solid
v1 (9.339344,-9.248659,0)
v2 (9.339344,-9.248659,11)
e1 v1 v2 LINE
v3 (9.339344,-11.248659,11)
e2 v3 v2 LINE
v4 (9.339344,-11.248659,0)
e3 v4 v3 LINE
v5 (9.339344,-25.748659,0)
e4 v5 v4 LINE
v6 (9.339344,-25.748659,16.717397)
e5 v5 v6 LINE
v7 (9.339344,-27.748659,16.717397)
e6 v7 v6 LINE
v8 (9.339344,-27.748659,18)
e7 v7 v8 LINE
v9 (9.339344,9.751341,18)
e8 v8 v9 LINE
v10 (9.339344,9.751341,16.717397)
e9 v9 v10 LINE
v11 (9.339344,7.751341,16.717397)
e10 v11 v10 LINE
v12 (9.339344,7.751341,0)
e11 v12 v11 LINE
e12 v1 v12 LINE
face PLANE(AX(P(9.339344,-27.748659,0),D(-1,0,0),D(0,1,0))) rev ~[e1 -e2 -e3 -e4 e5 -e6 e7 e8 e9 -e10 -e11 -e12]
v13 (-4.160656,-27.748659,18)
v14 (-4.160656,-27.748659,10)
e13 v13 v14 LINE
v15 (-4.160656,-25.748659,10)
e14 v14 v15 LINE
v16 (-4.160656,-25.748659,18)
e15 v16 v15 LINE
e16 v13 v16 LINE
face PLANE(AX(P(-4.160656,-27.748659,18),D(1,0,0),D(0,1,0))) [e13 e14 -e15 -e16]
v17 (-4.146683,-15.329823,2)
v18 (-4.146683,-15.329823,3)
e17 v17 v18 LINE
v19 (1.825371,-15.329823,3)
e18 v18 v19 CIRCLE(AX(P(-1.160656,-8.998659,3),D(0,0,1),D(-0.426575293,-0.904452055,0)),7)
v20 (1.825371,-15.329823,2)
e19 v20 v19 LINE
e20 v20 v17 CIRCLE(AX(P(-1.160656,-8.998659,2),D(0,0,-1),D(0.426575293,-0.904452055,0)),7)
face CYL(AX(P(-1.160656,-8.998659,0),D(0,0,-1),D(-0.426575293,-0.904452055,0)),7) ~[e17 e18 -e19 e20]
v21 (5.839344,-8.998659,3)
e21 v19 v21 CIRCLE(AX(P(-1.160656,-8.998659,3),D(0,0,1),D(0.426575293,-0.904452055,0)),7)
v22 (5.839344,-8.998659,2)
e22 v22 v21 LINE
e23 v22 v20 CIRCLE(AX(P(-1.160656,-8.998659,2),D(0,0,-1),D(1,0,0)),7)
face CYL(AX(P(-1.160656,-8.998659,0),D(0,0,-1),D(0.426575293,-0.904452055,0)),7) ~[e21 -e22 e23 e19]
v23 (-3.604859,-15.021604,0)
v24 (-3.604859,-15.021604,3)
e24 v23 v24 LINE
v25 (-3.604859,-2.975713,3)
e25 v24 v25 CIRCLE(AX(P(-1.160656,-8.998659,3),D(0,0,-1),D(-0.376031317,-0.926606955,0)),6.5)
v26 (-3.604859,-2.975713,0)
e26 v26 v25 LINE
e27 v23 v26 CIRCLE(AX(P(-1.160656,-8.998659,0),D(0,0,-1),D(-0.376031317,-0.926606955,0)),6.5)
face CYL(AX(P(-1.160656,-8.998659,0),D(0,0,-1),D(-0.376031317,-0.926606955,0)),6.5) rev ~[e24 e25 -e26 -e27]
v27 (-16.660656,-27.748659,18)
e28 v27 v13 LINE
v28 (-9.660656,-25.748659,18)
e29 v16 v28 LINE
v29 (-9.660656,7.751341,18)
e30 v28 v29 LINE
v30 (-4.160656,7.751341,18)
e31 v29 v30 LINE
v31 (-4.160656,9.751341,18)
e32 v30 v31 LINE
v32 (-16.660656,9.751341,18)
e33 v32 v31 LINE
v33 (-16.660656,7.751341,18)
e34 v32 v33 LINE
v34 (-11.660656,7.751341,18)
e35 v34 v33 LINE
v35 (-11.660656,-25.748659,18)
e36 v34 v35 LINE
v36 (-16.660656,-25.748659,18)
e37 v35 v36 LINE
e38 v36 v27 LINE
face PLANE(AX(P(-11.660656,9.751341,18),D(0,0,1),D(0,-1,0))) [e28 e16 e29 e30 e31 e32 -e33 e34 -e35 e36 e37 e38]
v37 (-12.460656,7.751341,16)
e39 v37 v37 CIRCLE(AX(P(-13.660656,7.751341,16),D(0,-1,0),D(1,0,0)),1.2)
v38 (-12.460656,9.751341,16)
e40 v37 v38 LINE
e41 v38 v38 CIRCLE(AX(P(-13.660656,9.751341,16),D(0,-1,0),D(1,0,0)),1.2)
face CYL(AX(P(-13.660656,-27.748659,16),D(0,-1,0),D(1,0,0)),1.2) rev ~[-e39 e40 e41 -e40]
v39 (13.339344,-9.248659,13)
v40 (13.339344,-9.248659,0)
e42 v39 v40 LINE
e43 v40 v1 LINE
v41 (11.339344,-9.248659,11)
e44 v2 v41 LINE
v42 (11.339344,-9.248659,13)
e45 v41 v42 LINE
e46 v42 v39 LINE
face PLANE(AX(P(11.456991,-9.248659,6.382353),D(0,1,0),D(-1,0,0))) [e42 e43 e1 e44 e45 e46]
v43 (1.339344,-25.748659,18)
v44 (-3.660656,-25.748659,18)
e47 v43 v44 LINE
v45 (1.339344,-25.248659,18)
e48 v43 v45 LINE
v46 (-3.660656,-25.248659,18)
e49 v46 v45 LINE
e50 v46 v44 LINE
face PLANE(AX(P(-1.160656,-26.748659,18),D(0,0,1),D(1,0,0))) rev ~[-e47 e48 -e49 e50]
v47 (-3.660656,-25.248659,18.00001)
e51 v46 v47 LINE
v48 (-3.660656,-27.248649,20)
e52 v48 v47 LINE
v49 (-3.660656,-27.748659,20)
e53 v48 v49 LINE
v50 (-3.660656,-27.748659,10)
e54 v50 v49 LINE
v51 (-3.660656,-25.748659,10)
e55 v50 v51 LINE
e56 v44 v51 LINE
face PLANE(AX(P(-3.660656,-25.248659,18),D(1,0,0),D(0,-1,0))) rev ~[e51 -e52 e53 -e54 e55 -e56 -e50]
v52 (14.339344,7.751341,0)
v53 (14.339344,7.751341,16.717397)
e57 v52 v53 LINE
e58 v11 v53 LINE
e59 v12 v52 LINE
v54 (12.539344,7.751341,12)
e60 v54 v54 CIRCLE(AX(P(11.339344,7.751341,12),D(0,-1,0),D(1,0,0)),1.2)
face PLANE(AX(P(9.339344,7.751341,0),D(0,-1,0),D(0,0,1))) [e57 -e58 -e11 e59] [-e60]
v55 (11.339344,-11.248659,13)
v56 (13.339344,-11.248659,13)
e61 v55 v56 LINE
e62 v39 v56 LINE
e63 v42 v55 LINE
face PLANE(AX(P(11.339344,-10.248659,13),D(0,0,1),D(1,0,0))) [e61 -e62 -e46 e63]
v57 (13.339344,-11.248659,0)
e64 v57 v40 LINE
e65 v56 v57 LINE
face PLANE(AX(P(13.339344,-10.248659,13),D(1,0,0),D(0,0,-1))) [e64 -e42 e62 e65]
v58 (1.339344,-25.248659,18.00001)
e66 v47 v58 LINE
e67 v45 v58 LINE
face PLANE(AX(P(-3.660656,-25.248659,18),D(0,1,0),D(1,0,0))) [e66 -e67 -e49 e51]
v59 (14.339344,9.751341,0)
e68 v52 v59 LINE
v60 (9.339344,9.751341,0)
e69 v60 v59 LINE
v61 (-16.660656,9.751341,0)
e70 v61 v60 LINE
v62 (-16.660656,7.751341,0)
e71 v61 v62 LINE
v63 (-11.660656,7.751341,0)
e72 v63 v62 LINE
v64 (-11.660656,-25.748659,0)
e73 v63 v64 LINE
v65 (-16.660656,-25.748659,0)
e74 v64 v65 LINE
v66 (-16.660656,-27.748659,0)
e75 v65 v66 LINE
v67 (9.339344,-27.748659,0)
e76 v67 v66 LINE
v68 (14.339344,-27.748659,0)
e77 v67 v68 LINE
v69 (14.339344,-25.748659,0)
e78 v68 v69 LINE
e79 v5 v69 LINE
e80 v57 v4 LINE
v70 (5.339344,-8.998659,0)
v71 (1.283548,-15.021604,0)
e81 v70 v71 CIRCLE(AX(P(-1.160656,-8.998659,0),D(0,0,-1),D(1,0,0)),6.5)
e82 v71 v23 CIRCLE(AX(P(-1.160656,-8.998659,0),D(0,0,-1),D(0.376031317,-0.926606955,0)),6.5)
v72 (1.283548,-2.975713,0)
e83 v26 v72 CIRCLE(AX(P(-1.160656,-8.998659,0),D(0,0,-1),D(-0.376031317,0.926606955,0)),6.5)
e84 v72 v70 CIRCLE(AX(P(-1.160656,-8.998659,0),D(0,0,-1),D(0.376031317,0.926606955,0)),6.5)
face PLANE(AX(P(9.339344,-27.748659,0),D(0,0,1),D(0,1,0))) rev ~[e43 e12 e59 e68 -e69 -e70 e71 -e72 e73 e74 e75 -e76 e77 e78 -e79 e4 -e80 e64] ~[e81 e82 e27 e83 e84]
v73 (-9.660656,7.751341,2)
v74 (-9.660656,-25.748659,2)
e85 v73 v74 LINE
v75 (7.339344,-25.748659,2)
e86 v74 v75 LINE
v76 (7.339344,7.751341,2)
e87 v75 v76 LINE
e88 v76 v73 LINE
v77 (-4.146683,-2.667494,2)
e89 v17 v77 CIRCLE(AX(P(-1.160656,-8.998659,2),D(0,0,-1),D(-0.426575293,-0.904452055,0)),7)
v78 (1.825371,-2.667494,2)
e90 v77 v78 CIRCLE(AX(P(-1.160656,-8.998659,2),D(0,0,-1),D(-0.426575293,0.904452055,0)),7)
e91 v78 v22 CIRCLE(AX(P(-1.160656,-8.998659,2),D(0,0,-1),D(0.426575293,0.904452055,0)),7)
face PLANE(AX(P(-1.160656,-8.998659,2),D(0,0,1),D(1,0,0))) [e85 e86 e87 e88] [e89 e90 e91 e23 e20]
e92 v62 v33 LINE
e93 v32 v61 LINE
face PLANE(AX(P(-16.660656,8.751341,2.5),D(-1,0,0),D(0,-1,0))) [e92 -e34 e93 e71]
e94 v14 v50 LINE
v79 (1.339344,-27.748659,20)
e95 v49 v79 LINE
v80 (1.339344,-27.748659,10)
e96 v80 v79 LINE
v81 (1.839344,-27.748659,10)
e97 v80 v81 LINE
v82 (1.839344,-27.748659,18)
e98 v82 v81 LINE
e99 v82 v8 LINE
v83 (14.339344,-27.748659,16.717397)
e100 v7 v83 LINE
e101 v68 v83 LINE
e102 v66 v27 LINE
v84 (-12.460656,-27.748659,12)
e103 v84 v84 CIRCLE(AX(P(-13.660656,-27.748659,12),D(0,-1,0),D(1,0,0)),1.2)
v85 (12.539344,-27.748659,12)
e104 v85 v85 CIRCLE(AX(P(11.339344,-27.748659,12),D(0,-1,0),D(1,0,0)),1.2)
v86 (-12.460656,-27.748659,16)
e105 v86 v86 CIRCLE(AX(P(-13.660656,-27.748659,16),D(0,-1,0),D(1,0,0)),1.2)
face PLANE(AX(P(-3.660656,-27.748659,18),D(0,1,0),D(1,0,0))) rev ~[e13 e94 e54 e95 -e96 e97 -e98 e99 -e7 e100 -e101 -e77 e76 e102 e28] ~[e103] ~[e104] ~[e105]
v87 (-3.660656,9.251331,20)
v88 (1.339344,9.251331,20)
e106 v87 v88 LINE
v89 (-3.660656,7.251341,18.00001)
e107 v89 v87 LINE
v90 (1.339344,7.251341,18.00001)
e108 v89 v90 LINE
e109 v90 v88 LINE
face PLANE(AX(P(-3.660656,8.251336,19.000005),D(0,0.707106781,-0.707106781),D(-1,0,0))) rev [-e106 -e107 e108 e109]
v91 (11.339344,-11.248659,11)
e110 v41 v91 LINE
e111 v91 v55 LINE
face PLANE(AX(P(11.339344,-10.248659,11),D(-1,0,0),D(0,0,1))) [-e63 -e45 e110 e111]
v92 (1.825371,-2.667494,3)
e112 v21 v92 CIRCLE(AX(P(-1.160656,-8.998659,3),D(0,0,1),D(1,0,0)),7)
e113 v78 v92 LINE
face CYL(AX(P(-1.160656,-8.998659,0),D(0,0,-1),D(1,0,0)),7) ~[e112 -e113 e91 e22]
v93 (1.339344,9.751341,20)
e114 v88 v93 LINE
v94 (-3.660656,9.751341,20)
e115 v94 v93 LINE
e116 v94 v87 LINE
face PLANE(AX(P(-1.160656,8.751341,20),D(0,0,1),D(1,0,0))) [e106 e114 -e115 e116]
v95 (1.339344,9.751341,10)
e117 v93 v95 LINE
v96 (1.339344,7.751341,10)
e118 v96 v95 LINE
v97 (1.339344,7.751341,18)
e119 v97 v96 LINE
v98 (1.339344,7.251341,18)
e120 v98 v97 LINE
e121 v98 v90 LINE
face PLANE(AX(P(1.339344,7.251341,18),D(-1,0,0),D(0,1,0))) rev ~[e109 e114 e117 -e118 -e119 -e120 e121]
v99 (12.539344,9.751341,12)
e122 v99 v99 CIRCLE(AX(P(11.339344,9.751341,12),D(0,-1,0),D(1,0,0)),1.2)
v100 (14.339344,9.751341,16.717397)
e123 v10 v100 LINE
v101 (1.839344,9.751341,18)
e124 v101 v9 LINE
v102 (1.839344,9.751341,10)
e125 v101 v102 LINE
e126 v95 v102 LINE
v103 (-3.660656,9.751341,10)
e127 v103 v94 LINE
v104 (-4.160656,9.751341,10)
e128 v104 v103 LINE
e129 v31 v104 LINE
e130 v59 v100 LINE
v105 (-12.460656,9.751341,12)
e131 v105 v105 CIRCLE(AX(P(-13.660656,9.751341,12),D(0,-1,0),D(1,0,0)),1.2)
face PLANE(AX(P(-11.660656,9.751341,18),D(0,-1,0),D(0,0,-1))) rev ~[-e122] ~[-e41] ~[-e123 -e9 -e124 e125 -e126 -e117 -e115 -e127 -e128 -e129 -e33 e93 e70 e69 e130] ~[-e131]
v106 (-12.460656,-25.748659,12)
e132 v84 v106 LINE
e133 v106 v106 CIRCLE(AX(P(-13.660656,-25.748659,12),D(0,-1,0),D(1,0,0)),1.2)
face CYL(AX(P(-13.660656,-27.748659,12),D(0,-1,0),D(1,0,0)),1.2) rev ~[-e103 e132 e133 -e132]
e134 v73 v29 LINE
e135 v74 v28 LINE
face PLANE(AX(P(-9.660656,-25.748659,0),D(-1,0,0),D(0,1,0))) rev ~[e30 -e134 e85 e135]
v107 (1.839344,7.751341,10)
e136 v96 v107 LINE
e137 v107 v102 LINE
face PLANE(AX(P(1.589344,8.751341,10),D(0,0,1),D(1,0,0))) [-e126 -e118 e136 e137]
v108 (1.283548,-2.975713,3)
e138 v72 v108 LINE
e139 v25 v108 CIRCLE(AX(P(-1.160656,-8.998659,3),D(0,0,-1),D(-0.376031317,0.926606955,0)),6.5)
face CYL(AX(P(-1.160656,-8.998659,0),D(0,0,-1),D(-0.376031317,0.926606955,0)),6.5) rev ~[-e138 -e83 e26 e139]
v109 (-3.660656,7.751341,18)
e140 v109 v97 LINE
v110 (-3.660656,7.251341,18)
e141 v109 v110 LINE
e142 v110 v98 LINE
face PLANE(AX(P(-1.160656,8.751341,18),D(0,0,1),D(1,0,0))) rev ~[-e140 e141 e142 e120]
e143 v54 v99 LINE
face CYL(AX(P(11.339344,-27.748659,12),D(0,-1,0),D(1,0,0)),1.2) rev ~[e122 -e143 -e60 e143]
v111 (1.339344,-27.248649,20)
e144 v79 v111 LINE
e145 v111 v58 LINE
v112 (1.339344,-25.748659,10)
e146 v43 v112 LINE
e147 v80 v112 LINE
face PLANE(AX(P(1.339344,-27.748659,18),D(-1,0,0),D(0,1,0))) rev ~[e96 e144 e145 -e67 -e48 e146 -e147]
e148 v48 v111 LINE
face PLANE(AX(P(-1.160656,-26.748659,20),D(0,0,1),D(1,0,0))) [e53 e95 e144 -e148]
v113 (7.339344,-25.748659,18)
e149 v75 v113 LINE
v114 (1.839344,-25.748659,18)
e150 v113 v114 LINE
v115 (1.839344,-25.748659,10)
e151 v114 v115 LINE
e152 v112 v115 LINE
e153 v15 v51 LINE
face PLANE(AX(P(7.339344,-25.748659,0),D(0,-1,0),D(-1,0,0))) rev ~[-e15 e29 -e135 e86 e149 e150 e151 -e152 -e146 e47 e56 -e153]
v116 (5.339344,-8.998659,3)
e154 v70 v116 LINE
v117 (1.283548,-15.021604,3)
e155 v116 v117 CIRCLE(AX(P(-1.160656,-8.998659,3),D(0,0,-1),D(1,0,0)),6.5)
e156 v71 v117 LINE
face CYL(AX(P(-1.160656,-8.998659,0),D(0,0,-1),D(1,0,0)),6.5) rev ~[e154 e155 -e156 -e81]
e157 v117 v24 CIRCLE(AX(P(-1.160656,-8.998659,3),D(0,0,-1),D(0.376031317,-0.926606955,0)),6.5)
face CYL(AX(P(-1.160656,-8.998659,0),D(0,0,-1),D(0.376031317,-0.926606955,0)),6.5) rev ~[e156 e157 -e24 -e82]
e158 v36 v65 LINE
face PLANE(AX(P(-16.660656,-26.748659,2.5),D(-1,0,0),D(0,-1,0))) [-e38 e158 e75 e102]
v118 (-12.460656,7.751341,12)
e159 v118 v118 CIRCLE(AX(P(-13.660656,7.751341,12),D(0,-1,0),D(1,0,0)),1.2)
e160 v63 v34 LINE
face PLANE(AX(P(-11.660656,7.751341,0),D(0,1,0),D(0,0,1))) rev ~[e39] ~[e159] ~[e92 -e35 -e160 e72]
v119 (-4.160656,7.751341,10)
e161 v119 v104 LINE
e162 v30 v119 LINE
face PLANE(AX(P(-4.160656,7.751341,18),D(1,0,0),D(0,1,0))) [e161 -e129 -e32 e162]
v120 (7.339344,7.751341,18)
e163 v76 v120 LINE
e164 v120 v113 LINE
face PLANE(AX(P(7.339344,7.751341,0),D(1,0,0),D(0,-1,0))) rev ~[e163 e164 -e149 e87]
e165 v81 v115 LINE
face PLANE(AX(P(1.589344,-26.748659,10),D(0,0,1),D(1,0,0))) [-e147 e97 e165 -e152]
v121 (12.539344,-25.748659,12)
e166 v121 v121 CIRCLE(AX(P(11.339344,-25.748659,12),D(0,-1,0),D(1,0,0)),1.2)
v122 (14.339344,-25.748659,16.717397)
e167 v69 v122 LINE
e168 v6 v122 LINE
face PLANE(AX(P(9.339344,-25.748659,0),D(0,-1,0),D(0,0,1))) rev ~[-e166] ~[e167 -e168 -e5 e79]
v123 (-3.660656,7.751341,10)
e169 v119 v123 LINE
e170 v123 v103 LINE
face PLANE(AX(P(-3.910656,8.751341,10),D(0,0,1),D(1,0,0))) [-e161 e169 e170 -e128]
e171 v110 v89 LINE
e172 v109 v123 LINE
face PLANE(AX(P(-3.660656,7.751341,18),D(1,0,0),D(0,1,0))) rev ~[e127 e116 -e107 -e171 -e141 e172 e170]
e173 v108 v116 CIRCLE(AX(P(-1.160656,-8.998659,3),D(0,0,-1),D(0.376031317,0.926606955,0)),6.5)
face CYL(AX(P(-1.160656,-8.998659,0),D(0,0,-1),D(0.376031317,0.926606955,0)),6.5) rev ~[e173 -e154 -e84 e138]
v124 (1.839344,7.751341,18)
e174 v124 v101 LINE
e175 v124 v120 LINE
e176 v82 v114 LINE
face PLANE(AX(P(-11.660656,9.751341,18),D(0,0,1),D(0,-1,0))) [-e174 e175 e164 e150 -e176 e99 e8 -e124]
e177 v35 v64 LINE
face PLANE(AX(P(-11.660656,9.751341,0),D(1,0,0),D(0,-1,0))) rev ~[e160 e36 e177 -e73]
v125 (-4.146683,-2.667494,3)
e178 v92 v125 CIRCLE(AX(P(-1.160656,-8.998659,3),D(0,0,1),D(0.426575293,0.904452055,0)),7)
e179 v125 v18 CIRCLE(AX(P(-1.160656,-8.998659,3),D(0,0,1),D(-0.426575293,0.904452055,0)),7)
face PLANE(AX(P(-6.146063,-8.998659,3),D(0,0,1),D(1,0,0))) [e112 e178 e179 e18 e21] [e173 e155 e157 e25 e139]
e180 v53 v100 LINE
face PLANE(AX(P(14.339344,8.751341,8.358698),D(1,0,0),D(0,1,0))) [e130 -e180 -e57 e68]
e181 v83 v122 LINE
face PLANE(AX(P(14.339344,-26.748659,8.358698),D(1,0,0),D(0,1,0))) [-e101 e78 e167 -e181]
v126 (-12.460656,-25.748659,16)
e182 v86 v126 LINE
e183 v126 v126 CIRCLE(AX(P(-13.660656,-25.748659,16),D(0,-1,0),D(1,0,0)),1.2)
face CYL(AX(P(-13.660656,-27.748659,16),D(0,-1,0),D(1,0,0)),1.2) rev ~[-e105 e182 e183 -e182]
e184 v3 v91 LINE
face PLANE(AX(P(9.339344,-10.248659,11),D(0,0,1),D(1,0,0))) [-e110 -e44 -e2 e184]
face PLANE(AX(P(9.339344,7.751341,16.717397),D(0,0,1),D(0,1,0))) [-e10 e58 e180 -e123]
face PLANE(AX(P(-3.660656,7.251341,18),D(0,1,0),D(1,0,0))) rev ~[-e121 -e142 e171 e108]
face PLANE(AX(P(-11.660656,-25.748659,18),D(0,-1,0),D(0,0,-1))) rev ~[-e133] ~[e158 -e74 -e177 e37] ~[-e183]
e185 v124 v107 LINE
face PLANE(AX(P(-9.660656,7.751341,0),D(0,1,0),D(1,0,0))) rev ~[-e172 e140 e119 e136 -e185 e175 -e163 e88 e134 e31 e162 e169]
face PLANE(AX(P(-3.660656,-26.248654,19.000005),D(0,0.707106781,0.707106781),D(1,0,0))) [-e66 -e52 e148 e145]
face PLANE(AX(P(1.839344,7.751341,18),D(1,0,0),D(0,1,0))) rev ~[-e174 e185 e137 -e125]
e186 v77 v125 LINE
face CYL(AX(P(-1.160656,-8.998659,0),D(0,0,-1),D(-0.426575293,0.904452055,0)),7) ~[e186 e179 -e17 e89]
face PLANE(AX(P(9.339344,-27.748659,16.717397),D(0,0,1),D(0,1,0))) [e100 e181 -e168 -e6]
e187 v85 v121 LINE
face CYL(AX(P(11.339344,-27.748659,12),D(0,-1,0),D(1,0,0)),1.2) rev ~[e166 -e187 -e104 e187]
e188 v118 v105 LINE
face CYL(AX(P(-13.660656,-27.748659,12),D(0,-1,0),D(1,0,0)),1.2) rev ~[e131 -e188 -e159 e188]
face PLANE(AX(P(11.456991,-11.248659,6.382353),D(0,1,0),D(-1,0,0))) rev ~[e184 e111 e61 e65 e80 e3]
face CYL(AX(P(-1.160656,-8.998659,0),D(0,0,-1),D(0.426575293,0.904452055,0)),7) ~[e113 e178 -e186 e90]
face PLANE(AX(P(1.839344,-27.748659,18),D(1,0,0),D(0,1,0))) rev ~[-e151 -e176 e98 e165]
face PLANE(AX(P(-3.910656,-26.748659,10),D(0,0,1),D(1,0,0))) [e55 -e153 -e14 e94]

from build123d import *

# Parameters (mm, degrees)
F1_DEPTH  = 2
F2_DEPTH  = 18
F3_DEPTH  = 3
F4_W      = 2
F4_H      = 5
F4_H_2    = 13
F5_DEPTH  = 5
F6_W      = 2
F6_H      = 16.7173967883
F7_DEPTH  = 5
F8_R      = 1.2
F9_DEPTH  = 40
F12_DEPTH = 1
F13_W     = 5
F13_H     = 2
F13_H_2   = 0.5
F14_DEPTH = 2
F15_SIZE  = 1.99999
F13_W_2   = 0.5
F16_DEPTH = 8


# Not quite as in the source:
# - a fillet or chamfer is up to 0.001 mm smaller than in the source, because OpenCascade refuses the exact size


with BuildPart() as f1:
    # F0 (on Top) → F1 (new body)
    with BuildSketch(Plane.XY):
        Polygon((-5.1606558692, 9.7513413054), (-11.6606558692, 9.7513413054), (-11.6606558692, -27.7486586946), (-5.1606558692, -27.7486586946), (2.8393441308, -27.7486586946), (9.3393441308, -27.7486586946), (9.3393441308, 9.7513413054), (2.8393441308, 9.7513413054), align=None)
        Polygon((-9.6606558692, -1.2486586946), (-9.6606558692, 7.7513413054), (7.3393441308, 7.7513413054), (7.3393441308, -1.2486586946), (7.3393441308, -16.7486586946), (7.3393441308, -25.7486586946), (-9.6606558692, -25.7486586946), (-9.6606558692, -16.7486586946), align=None, mode=Mode.SUBTRACT)
        with BuildLine():
            Line((3.3125979801, -16.7486586946), (-5.6339097184, -16.7486586946))
            ThreePointArc((-5.6339097184, -16.7486586946), (-2.8409986659, -25.1856853401), (4.3393441308, -19.9486586946))
            ThreePointArc((4.3393441308, -19.9486586946), (4.0763707763, -18.2683158979), (3.3125979801, -16.7486586946))
        make_face()
        with BuildLine():
            ThreePointArc((4.3393441308, 1.9513413054), (-2.8409986659, 7.1883679509), (-5.6339097184, -1.2486586946))
            Line((-5.6339097184, -1.2486586946), (3.3125979801, -1.2486586946))
            ThreePointArc((3.3125979801, -1.2486586946), (4.0763707763, 0.2709985087), (4.3393441308, 1.9513413054))
        make_face()
        with BuildLine():
            Line((7.3393441308, 7.7513413054), (-9.6606558692, 7.7513413054))
            Line((-9.6606558692, 7.7513413054), (-9.6606558692, -1.2486586946))
            Line((-9.6606558692, -1.2486586946), (-5.6339097184, -1.2486586946))
            ThreePointArc((-5.6339097184, -1.2486586946), (-2.8409986659, 7.1883679509), (4.3393441308, 1.9513413054))
            ThreePointArc((4.3393441308, 1.9513413054), (4.0763707763, 0.2709985087), (3.3125979801, -1.2486586946))
            Line((3.3125979801, -1.2486586946), (7.3393441308, -1.2486586946))
            Line((7.3393441308, -1.2486586946), (7.3393441308, 7.7513413054))
        make_face()
        with BuildLine():
            Line((-5.6339097184, -16.7486586946), (-9.6606558692, -16.7486586946))
            Line((-9.6606558692, -16.7486586946), (-9.6606558692, -25.7486586946))
            Line((-9.6606558692, -25.7486586946), (7.3393441308, -25.7486586946))
            Line((7.3393441308, -25.7486586946), (7.3393441308, -16.7486586946))
            Line((7.3393441308, -16.7486586946), (3.3125979801, -16.7486586946))
            ThreePointArc((3.3125979801, -16.7486586946), (4.0763707763, -18.2683158979), (4.3393441308, -19.9486586946))
            ThreePointArc((4.3393441308, -19.9486586946), (-2.8409986659, -25.1856853401), (-5.6339097184, -16.7486586946))
        make_face()
        with BuildLine():
            Line((7.3393441308, -16.7486586946), (7.3393441308, -1.2486586946))
            Line((7.3393441308, -1.2486586946), (3.3125979801, -1.2486586946))
            ThreePointArc((3.3125979801, -1.2486586946), (2.6358545698, -2.028169781), (1.8253711817, -2.667494311))
            ThreePointArc((1.8253711817, -2.667494311), (4.751289215, -5.2504717566), (5.8393441308, -8.9986586946))
            ThreePointArc((5.8393441308, -8.9986586946), (4.751289215, -12.7468456326), (1.8253711817, -15.3298230782))
            ThreePointArc((1.8253711817, -15.3298230782), (2.6358545698, -15.9691476082), (3.3125979801, -16.7486586946))
            Line((3.3125979801, -16.7486586946), (7.3393441308, -16.7486586946))
        make_face()
        with BuildLine():
            Line((-5.6339097184, -1.2486586946), (-9.6606558692, -1.2486586946))
            Line((-9.6606558692, -1.2486586946), (-9.6606558692, -16.7486586946))
            Line((-9.6606558692, -16.7486586946), (-5.6339097184, -16.7486586946))
            ThreePointArc((-5.6339097184, -16.7486586946), (-4.9571663082, -15.9691476082), (-4.14668292, -15.3298230782))
            ThreePointArc((-4.14668292, -15.3298230782), (-8.1606558692, -8.9986586946), (-4.14668292, -2.667494311))
            ThreePointArc((-4.14668292, -2.667494311), (-4.9571663082, -2.028169781), (-5.6339097184, -1.2486586946))
        make_face()
        with BuildLine():
            Line((3.3125979801, -1.2486586946), (-5.6339097184, -1.2486586946))
            ThreePointArc((-5.6339097184, -1.2486586946), (-4.9571663082, -2.028169781), (-4.14668292, -2.667494311))
            ThreePointArc((-4.14668292, -2.667494311), (-1.1606558692, -1.9986586946), (1.8253711817, -2.667494311))
            ThreePointArc((1.8253711817, -2.667494311), (2.6358545698, -2.028169781), (3.3125979801, -1.2486586946))
        make_face()
        with BuildLine():
            ThreePointArc((-4.14668292, -15.3298230782), (-4.9571663082, -15.9691476082), (-5.6339097184, -16.7486586946))
            Line((-5.6339097184, -16.7486586946), (3.3125979801, -16.7486586946))
            ThreePointArc((3.3125979801, -16.7486586946), (2.6358545698, -15.9691476082), (1.8253711817, -15.3298230782))
            ThreePointArc((1.8253711817, -15.3298230782), (-1.1606558692, -15.9986586946), (-4.14668292, -15.3298230782))
        make_face()
    extrude(amount=F1_DEPTH)

    # F0 (on Top) → F2 (join)
    with BuildSketch(Plane.XY):
        Polygon((-5.1606558692, 9.7513413054), (-11.6606558692, 9.7513413054), (-11.6606558692, -27.7486586946), (-5.1606558692, -27.7486586946), (2.8393441308, -27.7486586946), (9.3393441308, -27.7486586946), (9.3393441308, 9.7513413054), (2.8393441308, 9.7513413054), align=None)
        Polygon((-9.6606558692, -1.2486586946), (-9.6606558692, 7.7513413054), (7.3393441308, 7.7513413054), (7.3393441308, -1.2486586946), (7.3393441308, -16.7486586946), (7.3393441308, -25.7486586946), (-9.6606558692, -25.7486586946), (-9.6606558692, -16.7486586946), align=None, mode=Mode.SUBTRACT)
    extrude(amount=F2_DEPTH)

    # F0 (on Top) → F3 (join)
    with BuildSketch(Plane.XY):
        with BuildLine():
            ThreePointArc((-3.604859431, -2.9757134891), (-3.8801412786, -2.8292861752), (-4.14668292, -2.667494311))
            ThreePointArc((-4.14668292, -2.667494311), (-8.1606558692, -8.9986586946), (-4.14668292, -15.3298230782))
            ThreePointArc((-4.14668292, -15.3298230782), (-3.8801412786, -15.1680312141), (-3.604859431, -15.0216039001))
            ThreePointArc((-3.604859431, -15.0216039001), (-7.6606558692, -8.9986586946), (-3.604859431, -2.9757134891))
        make_face()
        with BuildLine():
            ThreePointArc((1.8253711817, -2.667494311), (-1.1606558692, -1.9986586946), (-4.14668292, -2.667494311))
            ThreePointArc((-4.14668292, -2.667494311), (-3.8801412786, -2.8292861752), (-3.604859431, -2.9757134891))
            ThreePointArc((-3.604859431, -2.9757134891), (-1.1606558692, -2.4986586946), (1.2835476927, -2.9757134891))
            ThreePointArc((1.2835476927, -2.9757134891), (1.5588295403, -2.8292861752), (1.8253711817, -2.667494311))
        make_face()
        with BuildLine():
            ThreePointArc((5.8393441308, -8.9986586946), (4.751289215, -5.2504717566), (1.8253711817, -2.667494311))
            ThreePointArc((1.8253711817, -2.667494311), (1.5588295403, -2.8292861752), (1.2835476927, -2.9757134891))
            ThreePointArc((1.2835476927, -2.9757134891), (4.2308802362, -5.3680473929), (5.3393441308, -8.9986586946))
            ThreePointArc((5.3393441308, -8.9986586946), (4.2308802362, -12.6292699963), (1.2835476927, -15.0216039001))
            ThreePointArc((1.2835476927, -15.0216039001), (1.5588295403, -15.1680312141), (1.8253711817, -15.3298230782))
            ThreePointArc((1.8253711817, -15.3298230782), (4.751289215, -12.7468456326), (5.8393441308, -8.9986586946))
        make_face()
        with BuildLine():
            ThreePointArc((-3.604859431, -15.0216039001), (-3.8801412786, -15.1680312141), (-4.14668292, -15.3298230782))
            ThreePointArc((-4.14668292, -15.3298230782), (-1.1606558692, -15.9986586946), (1.8253711817, -15.3298230782))
            ThreePointArc((1.8253711817, -15.3298230782), (1.5588295403, -15.1680312141), (1.2835476927, -15.0216039001))
            ThreePointArc((1.2835476927, -15.0216039001), (-1.1606558692, -15.4986586946), (-3.604859431, -15.0216039001))
        make_face()
    extrude(amount=F3_DEPTH)

    # F4 (on face) → F5 (join)
    with BuildSketch(Plane(origin=(-11.6606558692, 0, 0), x_dir=(0, -1, 0), z_dir=(-1, 0, 0))):
        with Locations((-8.7513413054, 2.5)):
            Rectangle(F4_W, F4_H)
        with Locations((-8.7513413054, 11.5)):
            Rectangle(F4_W, F4_H_2)
        with Locations((26.7486586946, 2.5)):
            Rectangle(F4_W, F4_H)
        with Locations((26.7486586946, 11.5)):
            Rectangle(F4_W, F4_H_2)
    extrude(amount=F5_DEPTH)

    # F6 (on face) → F7 (join)
    with BuildSketch(Plane.YZ.offset(9.3393441308)):
        with Locations((-26.7486586946, 8.3586983941)):
            Rectangle(F6_W, F6_H)
        with Locations((8.7513413054, 8.3586983941)):
            Rectangle(F6_W, F6_H)
    extrude(amount=F7_DEPTH)

    # F8 (on face) → F9 (cut)
    with BuildSketch(Plane.XZ.offset(27.7486586946)):
        with Locations((-13.6606558692, 12)):
            Circle(F8_R)
        with Locations((11.3393441308, 12)):
            Circle(F8_R)
        with Locations((-13.6606558692, 16)):
            Circle(F8_R)
    extrude(amount=-F9_DEPTH, mode=Mode.SUBTRACT)

    # F11 (on offset) → F12 (join, symmetric)
    with BuildSketch(Plane(origin=(0, -10.2486586946, 0), x_dir=(-1, 0, 0), z_dir=(0, 1, 0))):
        Polygon((-13.3393441308, 13), (-13.3393441308, 0), (-9.3393441308, 0), (-9.3393441308, 11), (-11.3393441308, 11), (-11.3393441308, 13), align=None)
    extrude(amount=F12_DEPTH, both=True)

    # F13 (on face) → F14 (join)
    with BuildSketch(Plane.XY.offset(18)):
        with Locations((-1.1606558692, -26.7486586946)):
            Rectangle(F13_W, F13_H)
        with Locations((-1.1606558692, -25.4986586946)):
            Rectangle(F13_W, F13_H_2)
        with Locations((-1.1606558692, 8.7513413054)):
            Rectangle(F13_W, F13_H)
        with Locations((-1.1606558692, 7.5013413054)):
            Rectangle(F13_W, F13_H_2)
    extrude(amount=F14_DEPTH)

    # F15 (size 2 in the source; OpenCascade refuses exactly that, so slightly less here)
    f15_edges = [f1.edges().sort_by_distance(p)[0] for p in [
        (-1.160656, -25.248659, 20),
        (-1.160656, 7.251341, 20),
    ]]
    chamfer(f15_edges, length=F15_SIZE)

    # F13 (on face) → F16 (cut)
    with BuildSketch(Plane.XY.offset(18)):
        with Locations((-3.9106558692, -26.7486586946)):
            Rectangle(F13_W_2, F13_H)
        with Locations((1.5893441308, -26.7486586946)):
            Rectangle(F13_W_2, F13_H)
        with Locations((1.5893441308, 8.7513413054)):
            Rectangle(F13_W_2, F13_H)
        with Locations((-3.9106558692, 8.7513413054)):
            Rectangle(F13_W_2, F13_H)
    extrude(amount=-F16_DEPTH, mode=Mode.SUBTRACT)


solid = f1.part
